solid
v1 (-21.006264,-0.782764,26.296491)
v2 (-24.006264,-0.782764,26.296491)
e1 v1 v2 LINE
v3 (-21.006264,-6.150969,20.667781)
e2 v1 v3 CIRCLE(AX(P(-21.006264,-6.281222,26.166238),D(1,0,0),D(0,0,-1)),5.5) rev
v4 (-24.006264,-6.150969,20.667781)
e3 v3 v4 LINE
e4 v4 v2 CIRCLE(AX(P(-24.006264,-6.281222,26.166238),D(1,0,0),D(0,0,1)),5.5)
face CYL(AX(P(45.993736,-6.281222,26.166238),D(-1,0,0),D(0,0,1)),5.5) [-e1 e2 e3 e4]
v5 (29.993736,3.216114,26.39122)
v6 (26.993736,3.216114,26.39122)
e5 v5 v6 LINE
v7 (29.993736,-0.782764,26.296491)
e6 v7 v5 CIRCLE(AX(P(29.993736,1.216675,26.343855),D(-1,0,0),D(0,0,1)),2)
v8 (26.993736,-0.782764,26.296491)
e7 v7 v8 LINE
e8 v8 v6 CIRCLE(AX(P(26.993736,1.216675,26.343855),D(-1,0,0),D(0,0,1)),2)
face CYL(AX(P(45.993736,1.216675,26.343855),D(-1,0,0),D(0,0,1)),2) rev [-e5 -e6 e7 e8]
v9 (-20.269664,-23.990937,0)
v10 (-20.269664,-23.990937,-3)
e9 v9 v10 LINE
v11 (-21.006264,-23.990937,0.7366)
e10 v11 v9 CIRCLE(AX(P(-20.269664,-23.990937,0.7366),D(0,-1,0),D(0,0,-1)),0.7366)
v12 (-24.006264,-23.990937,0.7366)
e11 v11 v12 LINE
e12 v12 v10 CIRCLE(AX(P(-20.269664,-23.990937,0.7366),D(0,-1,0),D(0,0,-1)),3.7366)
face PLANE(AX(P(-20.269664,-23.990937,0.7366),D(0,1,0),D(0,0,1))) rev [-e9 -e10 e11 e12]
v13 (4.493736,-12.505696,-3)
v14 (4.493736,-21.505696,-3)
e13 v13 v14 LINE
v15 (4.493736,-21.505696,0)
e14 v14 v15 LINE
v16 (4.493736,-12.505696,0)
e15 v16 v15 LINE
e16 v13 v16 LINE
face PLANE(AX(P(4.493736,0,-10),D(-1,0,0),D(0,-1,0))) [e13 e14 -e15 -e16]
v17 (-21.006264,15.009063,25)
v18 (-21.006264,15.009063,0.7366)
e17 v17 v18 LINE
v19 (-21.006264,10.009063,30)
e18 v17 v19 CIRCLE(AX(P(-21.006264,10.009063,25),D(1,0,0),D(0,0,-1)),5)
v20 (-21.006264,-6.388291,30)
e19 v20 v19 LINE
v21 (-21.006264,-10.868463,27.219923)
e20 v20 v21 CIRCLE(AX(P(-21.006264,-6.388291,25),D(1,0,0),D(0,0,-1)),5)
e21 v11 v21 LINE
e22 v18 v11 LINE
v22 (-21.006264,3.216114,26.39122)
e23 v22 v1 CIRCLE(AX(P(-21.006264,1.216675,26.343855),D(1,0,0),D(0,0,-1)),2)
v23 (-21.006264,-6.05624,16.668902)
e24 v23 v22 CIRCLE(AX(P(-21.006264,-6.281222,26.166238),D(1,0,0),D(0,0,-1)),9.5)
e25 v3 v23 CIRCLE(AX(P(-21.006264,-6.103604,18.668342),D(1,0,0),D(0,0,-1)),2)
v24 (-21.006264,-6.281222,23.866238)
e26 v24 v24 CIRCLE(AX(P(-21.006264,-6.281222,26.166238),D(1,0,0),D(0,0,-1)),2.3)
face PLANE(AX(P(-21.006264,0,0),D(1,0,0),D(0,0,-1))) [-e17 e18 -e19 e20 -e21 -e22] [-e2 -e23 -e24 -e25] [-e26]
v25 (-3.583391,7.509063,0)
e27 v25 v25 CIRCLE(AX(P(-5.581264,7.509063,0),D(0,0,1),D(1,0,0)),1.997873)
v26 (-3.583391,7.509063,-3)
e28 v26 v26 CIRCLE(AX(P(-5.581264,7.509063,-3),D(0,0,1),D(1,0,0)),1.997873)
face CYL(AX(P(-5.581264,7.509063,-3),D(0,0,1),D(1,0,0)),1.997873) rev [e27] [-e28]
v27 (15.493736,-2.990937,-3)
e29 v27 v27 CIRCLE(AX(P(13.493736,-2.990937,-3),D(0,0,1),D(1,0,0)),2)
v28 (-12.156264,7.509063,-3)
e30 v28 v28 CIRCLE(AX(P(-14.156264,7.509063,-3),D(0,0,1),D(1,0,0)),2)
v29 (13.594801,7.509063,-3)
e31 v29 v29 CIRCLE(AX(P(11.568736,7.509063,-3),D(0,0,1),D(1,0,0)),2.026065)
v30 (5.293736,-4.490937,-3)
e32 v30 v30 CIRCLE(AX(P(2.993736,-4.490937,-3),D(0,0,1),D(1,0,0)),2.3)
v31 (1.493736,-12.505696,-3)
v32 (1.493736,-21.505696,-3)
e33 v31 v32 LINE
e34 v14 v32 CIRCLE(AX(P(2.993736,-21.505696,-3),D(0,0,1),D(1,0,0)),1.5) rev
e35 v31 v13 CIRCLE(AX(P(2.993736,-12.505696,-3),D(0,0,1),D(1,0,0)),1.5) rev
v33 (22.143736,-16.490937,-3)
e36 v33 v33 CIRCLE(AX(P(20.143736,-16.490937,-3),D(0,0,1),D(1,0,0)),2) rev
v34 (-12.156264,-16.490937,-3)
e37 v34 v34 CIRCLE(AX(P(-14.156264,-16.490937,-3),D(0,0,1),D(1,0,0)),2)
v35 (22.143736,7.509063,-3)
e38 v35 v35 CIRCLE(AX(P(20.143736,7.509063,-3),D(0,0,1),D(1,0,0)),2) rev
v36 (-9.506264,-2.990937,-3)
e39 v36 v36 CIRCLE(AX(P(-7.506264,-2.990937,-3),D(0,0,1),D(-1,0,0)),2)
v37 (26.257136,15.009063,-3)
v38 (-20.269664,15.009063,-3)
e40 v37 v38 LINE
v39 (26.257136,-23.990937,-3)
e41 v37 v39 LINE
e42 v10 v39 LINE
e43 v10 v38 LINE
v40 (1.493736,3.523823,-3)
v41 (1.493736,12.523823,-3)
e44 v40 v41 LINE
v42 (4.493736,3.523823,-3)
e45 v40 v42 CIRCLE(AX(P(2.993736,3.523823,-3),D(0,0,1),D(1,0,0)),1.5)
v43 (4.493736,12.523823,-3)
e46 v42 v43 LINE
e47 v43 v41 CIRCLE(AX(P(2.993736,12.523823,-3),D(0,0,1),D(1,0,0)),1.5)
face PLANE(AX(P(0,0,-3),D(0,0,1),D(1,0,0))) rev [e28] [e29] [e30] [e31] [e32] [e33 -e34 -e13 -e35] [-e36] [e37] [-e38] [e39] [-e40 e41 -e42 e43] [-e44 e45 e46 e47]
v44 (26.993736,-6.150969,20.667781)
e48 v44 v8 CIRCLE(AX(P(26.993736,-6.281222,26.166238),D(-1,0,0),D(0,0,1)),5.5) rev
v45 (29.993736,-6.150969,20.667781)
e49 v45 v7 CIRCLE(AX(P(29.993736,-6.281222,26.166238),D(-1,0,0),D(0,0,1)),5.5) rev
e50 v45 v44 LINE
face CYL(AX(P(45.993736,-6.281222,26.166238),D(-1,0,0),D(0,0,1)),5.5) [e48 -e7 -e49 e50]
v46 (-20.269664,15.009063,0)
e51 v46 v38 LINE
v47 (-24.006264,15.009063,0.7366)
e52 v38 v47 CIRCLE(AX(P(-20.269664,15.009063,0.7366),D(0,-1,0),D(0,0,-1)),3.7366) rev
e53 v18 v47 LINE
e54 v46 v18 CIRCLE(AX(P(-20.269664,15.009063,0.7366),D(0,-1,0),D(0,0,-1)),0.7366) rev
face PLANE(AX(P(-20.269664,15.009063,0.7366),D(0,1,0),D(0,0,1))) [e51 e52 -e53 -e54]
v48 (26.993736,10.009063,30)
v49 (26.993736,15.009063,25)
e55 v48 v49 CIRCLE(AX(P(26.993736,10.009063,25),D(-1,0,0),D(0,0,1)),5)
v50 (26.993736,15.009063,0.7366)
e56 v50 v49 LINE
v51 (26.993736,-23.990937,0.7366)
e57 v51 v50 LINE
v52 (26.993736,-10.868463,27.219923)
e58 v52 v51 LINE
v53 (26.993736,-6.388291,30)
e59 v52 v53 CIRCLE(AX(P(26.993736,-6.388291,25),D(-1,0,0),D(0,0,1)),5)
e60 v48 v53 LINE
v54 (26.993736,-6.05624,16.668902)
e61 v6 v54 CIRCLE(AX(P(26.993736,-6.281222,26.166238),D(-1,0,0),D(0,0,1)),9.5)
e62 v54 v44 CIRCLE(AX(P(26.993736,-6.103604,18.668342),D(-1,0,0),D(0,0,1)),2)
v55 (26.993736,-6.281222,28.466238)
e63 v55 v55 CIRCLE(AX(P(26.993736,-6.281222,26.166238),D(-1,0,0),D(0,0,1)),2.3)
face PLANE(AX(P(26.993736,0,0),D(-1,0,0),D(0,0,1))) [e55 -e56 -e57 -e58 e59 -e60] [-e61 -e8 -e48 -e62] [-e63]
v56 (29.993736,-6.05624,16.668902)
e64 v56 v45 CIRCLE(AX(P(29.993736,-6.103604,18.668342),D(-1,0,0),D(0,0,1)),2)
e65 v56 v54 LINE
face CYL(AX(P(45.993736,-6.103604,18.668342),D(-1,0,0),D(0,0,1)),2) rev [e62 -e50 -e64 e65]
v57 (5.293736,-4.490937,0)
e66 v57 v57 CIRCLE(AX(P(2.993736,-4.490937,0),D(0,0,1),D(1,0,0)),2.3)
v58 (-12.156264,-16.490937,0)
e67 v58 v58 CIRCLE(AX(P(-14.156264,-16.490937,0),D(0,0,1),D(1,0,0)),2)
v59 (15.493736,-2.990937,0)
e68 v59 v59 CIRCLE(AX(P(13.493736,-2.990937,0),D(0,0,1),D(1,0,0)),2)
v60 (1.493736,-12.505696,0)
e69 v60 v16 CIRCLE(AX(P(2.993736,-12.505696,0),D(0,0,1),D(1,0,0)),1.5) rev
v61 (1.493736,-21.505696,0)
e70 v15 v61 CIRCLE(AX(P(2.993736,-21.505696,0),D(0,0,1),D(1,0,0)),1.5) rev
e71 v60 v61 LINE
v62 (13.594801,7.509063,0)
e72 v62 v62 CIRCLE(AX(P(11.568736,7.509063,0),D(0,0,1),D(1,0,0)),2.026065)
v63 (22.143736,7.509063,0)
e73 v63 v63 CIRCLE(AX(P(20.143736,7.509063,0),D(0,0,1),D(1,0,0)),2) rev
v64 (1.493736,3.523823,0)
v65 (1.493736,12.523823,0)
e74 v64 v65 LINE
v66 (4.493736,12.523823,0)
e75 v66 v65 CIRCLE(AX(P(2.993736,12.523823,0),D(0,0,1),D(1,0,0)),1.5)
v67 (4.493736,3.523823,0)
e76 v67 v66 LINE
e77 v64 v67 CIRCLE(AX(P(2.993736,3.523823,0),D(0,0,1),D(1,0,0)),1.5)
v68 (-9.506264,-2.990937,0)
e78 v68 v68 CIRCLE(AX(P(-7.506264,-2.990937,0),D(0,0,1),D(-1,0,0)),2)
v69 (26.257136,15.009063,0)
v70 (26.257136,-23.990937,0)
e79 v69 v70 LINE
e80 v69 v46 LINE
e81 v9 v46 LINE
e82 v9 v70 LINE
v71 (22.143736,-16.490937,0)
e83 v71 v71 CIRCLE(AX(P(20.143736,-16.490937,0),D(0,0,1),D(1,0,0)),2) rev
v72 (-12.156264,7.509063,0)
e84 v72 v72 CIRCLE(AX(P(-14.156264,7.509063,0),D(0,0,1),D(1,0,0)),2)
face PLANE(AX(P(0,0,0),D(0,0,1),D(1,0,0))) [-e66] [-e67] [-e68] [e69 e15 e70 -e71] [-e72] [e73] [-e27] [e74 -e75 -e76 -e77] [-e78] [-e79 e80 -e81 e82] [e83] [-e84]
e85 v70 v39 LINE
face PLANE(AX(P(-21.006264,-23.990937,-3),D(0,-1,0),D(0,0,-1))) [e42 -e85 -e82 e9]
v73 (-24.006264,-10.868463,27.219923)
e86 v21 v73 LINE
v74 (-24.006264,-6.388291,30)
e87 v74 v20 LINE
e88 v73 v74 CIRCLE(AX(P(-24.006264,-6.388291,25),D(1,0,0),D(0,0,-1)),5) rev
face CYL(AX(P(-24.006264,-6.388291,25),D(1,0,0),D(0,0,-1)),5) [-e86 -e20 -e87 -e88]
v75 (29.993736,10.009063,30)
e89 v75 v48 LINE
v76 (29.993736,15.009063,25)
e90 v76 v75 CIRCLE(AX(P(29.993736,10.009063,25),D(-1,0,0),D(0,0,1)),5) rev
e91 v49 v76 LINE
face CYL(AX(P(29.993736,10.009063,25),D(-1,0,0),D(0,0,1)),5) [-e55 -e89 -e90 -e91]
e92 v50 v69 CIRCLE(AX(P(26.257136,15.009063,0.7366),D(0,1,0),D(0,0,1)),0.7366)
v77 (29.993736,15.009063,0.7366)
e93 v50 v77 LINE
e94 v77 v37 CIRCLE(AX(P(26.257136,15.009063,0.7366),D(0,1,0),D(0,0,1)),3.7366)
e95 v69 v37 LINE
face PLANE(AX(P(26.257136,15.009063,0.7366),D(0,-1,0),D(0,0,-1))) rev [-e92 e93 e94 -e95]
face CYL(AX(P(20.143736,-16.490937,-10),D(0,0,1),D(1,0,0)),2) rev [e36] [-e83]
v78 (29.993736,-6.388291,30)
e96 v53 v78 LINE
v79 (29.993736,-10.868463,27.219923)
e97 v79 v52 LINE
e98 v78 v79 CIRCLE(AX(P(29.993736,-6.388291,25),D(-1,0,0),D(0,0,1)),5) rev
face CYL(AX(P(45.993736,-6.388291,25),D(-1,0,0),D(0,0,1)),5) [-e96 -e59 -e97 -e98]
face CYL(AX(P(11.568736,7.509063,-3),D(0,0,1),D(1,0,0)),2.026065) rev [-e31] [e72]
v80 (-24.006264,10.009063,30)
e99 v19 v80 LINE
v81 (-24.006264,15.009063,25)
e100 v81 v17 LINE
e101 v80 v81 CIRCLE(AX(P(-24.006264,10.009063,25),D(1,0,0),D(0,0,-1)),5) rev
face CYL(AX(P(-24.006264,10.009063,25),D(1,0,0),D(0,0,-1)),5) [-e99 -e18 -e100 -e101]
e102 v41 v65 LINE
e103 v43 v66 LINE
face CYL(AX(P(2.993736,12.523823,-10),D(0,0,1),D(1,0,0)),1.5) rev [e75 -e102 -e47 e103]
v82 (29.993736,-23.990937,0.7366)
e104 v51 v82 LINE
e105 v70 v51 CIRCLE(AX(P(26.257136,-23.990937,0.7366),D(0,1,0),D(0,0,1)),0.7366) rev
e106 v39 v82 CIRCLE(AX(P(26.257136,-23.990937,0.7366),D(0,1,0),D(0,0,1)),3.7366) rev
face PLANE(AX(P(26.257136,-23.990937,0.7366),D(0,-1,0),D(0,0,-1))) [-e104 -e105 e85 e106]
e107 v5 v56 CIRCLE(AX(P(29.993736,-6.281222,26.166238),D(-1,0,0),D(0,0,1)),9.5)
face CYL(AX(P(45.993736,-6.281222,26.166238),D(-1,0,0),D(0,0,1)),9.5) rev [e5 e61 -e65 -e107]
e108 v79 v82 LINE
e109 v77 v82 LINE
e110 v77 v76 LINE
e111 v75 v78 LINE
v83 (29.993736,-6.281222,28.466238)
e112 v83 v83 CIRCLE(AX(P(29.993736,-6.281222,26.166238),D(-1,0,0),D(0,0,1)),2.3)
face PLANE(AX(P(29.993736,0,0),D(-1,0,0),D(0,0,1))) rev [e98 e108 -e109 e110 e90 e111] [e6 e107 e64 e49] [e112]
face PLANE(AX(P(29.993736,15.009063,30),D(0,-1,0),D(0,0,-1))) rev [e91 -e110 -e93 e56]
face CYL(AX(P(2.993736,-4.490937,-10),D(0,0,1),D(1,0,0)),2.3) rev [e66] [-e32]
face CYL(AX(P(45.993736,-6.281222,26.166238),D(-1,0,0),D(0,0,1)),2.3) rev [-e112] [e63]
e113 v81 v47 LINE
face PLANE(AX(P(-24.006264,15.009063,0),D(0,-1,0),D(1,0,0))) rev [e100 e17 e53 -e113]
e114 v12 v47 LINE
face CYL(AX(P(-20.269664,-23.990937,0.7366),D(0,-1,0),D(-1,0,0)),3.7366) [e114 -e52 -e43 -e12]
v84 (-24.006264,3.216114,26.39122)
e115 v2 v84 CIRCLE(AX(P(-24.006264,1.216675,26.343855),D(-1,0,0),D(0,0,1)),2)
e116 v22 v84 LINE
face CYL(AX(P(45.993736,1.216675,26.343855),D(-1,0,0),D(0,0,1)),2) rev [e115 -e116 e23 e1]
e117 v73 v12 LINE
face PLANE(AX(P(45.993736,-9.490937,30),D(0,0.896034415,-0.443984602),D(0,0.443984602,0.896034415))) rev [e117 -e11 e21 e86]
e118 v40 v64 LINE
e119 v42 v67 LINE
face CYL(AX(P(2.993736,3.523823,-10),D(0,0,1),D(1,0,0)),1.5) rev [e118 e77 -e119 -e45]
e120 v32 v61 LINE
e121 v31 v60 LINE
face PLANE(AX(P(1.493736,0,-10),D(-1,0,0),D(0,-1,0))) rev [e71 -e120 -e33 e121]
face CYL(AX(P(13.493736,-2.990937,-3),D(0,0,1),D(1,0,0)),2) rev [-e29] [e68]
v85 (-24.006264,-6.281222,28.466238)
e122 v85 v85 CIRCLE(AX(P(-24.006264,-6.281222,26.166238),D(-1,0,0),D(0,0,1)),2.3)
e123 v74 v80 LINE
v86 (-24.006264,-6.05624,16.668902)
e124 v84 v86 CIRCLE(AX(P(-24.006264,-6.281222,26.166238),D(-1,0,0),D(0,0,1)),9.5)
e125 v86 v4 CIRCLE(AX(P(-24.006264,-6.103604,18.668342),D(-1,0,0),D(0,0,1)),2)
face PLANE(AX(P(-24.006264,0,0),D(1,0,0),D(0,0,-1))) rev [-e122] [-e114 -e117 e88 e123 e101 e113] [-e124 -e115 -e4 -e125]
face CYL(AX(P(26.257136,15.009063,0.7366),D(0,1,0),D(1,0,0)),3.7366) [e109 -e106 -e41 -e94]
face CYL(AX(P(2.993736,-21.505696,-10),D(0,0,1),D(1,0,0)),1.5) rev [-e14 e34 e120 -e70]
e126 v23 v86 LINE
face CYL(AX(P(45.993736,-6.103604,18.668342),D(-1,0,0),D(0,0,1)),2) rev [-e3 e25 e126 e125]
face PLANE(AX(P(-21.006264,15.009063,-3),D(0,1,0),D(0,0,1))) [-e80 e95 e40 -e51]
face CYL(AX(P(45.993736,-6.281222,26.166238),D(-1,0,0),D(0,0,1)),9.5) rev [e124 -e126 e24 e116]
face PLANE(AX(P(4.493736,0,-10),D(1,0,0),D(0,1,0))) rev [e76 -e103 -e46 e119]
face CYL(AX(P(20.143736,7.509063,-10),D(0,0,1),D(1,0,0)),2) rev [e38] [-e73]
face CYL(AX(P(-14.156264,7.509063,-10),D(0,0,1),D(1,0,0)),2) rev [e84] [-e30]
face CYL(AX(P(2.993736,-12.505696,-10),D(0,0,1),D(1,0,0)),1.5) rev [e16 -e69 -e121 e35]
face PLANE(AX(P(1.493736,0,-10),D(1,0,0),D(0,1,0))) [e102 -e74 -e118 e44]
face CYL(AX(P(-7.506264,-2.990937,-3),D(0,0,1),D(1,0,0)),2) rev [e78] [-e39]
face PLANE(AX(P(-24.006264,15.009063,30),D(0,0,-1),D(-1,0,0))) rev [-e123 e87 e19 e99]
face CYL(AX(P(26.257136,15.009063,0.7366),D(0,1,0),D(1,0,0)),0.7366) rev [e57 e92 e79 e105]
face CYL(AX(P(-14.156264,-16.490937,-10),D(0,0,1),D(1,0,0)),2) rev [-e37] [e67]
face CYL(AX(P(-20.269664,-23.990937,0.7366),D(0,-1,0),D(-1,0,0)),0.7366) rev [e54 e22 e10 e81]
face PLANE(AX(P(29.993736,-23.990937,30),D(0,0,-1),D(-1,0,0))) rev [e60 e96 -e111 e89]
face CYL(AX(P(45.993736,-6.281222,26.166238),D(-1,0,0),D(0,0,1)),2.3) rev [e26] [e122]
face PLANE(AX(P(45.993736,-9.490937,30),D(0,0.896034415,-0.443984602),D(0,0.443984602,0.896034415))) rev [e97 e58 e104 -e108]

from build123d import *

# Parameters (mm, degrees)
ESBO_O1_W                        = 48
ESBO_O1_H                        = 39
FLANGE_BASE1_DEPTH               = 3
ESBO_O6_R                        = 2.3
CORTE_EXTRUS_O1_DEPTH            = 10
ARESTA_FLANGE1_STRIP_W           = 13.4732
ARESTA_FLANGE1_STRIP_H           = 3
ARESTA_FLANGE1_STRIP_CUT_DEPTH   = 39
ARESTA_FLANGE1_STRIP_2_W         = 13.4732
ARESTA_FLANGE1_STRIP_2_H         = 3
ARESTA_FLANGE1_STRIP_CUT_2_DEPTH = 39
ARESTA_FLANGE1_DEPTH             = 39
ARESTA_FLANGE1_BEND_DEPTH        = 39
ESBO_O13_R                       = 2.3
CORTE_EXTRUS_O2_DEPTH            = 70
FILETE1_R                        = 5
ESBO_O14_R                       = 1.997873176
ESBO_O14_R_2                     = 2.026064888
ESBO_O14_R_3                     = 2
CORTE_EXTRUS_O4_DEPTH            = 3


# Sheet-metal steps are written as plain solids
with BuildPart() as part:
    # Esboço1 → Flange-base1 (new body)
    with BuildSketch(Plane.XY):
        with Locations((2.993735783, -4.490936556)):
            Rectangle(ESBO_O1_W, ESBO_O1_H)
    extrude(amount=-FLANGE_BASE1_DEPTH)

    # Esboço6 → Corte-extrusão1 (cut)
    with BuildSketch(Plane.XY):
        with BuildLine():
            Line((-14.156264217, 5.509063444), (-14.156264217, 7.509063444))
            Line((-14.156264217, 7.509063444), (-12.156264217, 7.509063444))
            ThreePointArc((-12.156264217, 7.509063444), (-15.570477779, 8.923277006), (-14.156264217, 5.509063444))
        make_face()
        with BuildLine():
            Line((-12.156264217, 7.509063444), (-14.156264217, 7.509063444))
            Line((-14.156264217, 7.509063444), (-14.156264217, 5.509063444))
            ThreePointArc((-14.156264217, 5.509063444), (-12.742050654, 6.094849882), (-12.156264217, 7.509063444))
        make_face()
        with BuildLine():
            ThreePointArc((-12.156264217, -16.490936556), (-12.742050654, -15.076722994), (-14.156264217, -14.490936556))
            Line((-14.156264217, -14.490936556), (-14.156264217, -16.490936556))
            Line((-14.156264217, -16.490936556), (-12.156264217, -16.490936556))
        make_face()
        with BuildLine():
            Line((-14.156264217, -16.490936556), (-14.156264217, -14.490936556))
            ThreePointArc((-14.156264217, -14.490936556), (-15.570477779, -17.905150118), (-12.156264217, -16.490936556))
            Line((-12.156264217, -16.490936556), (-14.156264217, -16.490936556))
        make_face()
        with Locations((2.993735783, -4.490936556)):
            Circle(ESBO_O6_R)
        with BuildLine():
            Line((4.493735783, 7.509063444), (1.493735783, 7.509063444))
            Line((1.493735783, 7.509063444), (1.493735783, 3.523823043))
            ThreePointArc((1.493735783, 3.523823043), (2.993735783, 2.023823043), (4.493735783, 3.523823043))
            Line((4.493735783, 3.523823043), (4.493735783, 7.509063444))
        make_face()
        with BuildLine():
            Line((1.493735783, 12.523823043), (1.493735783, 7.509063444))
            Line((1.493735783, 7.509063444), (4.493735783, 7.509063444))
            Line((4.493735783, 7.509063444), (4.493735783, 12.523823043))
            ThreePointArc((4.493735783, 12.523823043), (2.993735783, 14.023823043), (1.493735783, 12.523823043))
        make_face()
        with BuildLine():
            Line((1.493735783, -12.505696155), (1.493735783, -16.490936556))
            Line((1.493735783, -16.490936556), (4.493735783, -16.490936556))
            Line((4.493735783, -16.490936556), (4.493735783, -12.505696155))
            ThreePointArc((4.493735783, -12.505696155), (2.993735783, -11.005696155), (1.493735783, -12.505696155))
        make_face()
        with BuildLine():
            Line((4.493735783, -16.490936556), (1.493735783, -16.490936556))
            Line((1.493735783, -16.490936556), (1.493735783, -21.505696155))
            ThreePointArc((1.493735783, -21.505696155), (2.993735783, -23.005696155), (4.493735783, -21.505696155))
            Line((4.493735783, -21.505696155), (4.493735783, -16.490936556))
        make_face()
        with BuildLine():
            ThreePointArc((22.143735783, -16.490936556), (21.557949346, -15.076722994), (20.143735783, -14.490936556))
            Line((20.143735783, -14.490936556), (20.143735783, -16.490936556))
            Line((20.143735783, -16.490936556), (18.143735783, -16.490936556))
            ThreePointArc((18.143735783, -16.490936556), (20.143735783, -18.490936556), (22.143735783, -16.490936556))
        make_face()
        with BuildLine():
            Line((20.143735783, -16.490936556), (20.143735783, -14.490936556))
            ThreePointArc((20.143735783, -14.490936556), (18.729522221, -15.076722994), (18.143735783, -16.490936556))
            Line((18.143735783, -16.490936556), (20.143735783, -16.490936556))
        make_face()
        with BuildLine():
            ThreePointArc((22.143735783, 7.509063444), (20.143735783, 9.509063444), (18.143735783, 7.509063444))
            Line((18.143735783, 7.509063444), (20.143735783, 7.509063444))
            Line((20.143735783, 7.509063444), (20.143735783, 5.509063444))
            ThreePointArc((20.143735783, 5.509063444), (21.557949346, 6.094849882), (22.143735783, 7.509063444))
        make_face()
        with BuildLine():
            Line((20.143735783, 7.509063444), (18.143735783, 7.509063444))
            ThreePointArc((18.143735783, 7.509063444), (18.729522221, 6.094849882), (20.143735783, 5.509063444))
            Line((20.143735783, 5.509063444), (20.143735783, 7.509063444))
        make_face()
    extrude(amount=-CORTE_EXTRUS_O1_DEPTH, mode=Mode.SUBTRACT)

    # Aresta-Flange1 strip (across the edge) → Aresta-Flange1 strip cut (cut)
    with BuildSketch(Plane(origin=(26.993735783, -23.990936556, 0), x_dir=(-1, 0, 0), z_dir=(0, 1, 0))):
        with Locations((-6, -1.5)):
            Rectangle(ARESTA_FLANGE1_STRIP_W, ARESTA_FLANGE1_STRIP_H)
    extrude(amount=ARESTA_FLANGE1_STRIP_CUT_DEPTH, mode=Mode.SUBTRACT)

    # Aresta-Flange1 strip 2 (across the edge) → Aresta-Flange1 strip cut 2 (cut)
    with BuildSketch(Plane(origin=(-21.006264217, 15.009063444, 0), x_dir=(1, 0, 0), z_dir=(0, -1, 0))):
        with Locations((-6, -1.5)):
            Rectangle(ARESTA_FLANGE1_STRIP_2_W, ARESTA_FLANGE1_STRIP_2_H)
    extrude(amount=ARESTA_FLANGE1_STRIP_CUT_2_DEPTH, mode=Mode.SUBTRACT)

    # Aresta-Flange1 section (across the edge) → Aresta-Flange1 (add)
    with BuildSketch(Plane(origin=(26.993735783, -23.990936556, 0), x_dir=(-1, 0, 0), z_dir=(0, 1, 0))):
        with BuildLine():
            Line((-3, 0.7366), (-3, 30))
            Line((-3, 30), (0, 30))
            Line((0, 30), (0, 0.7366))
            ThreePointArc((0, 0.7366), (0.215745145, 0.215745145), (0.7366, 0))
            Line((0.7366, 0), (0.7366, -3))
            ThreePointArc((0.7366, -3), (-1.905575199, -1.905575199), (-3, 0.7366))
        make_face()
    extrude(amount=ARESTA_FLANGE1_DEPTH)

    # Aresta-Flange1 section 2 (across the edge) → Aresta-Flange1 bend (add)
    with BuildSketch(Plane(origin=(-21.006264217, 15.009063444, 0), x_dir=(1, 0, 0), z_dir=(0, -1, 0))):
        with BuildLine():
            Line((-3, 0.7366), (-3, 30))
            Line((-3, 30), (0, 30))
            Line((0, 30), (0, 0.7366))
            ThreePointArc((0, 0.7366), (0.215745145, 0.215745145), (0.7366, 0))
            Line((0.7366, 0), (0.7366, -3))
            ThreePointArc((0.7366, -3), (-1.905575199, -1.905575199), (-3, 0.7366))
        make_face()
    extrude(amount=ARESTA_FLANGE1_BEND_DEPTH)

    # Esboço13 → Corte-extrusão2 (cut)
    with BuildSketch(Plane.ZY.offset(24.006264217)):
        with Locations((26.166238029, -6.281221748)):
            Circle(ESBO_O13_R)
        Polygon((0.7366, -23.990936556), (30, -23.990936556), (30, -9.490936556), align=None)
        with BuildLine():
            ThreePointArc((26.391219924, 3.216113833), (19.60969386, 0.593494869), (16.668902447, -6.056239853))
            ThreePointArc((16.668902447, -6.056239853), (18.620976907, -8.103043532), (20.667780587, -6.150969072))
            ThreePointArc((20.667780587, -6.150969072), (22.370344036, -2.301122654), (26.296490705, -0.782764306))
            ThreePointArc((26.296490705, -0.782764306), (28.343294384, 1.169310154), (26.391219924, 3.216113833))
        make_face()
    extrude(amount=-CORTE_EXTRUS_O2_DEPTH, mode=Mode.SUBTRACT)

    # Filete1
    filete1_edges = [part.edges().sort_by_distance(p)[0] for p in [
        (28.493735783, 15.009063444, 30),
        (-22.506264217, 15.009063444, 30),
        (-22.506264217, -9.490936556, 30),
        (28.493735783, -9.490936556, 30),
    ]]
    fillet(filete1_edges, radius=FILETE1_R)

    # Esboço14 → Corte-extrusão4 (cut)
    with BuildSketch(Plane.XY):
        with Locations((-5.581264217, 7.509063444)):
            Circle(ESBO_O14_R)
        with Locations((11.568735783, 7.509063444)):
            Circle(ESBO_O14_R_2)
        with Locations((13.493735783, -2.990936556)):
            Circle(ESBO_O14_R_3)
        with Locations(Location((-7.506264217, -2.990936556, 0), (0, 0, 180))):
            Circle(ESBO_O14_R_3)
    extrude(amount=-CORTE_EXTRUS_O4_DEPTH, mode=Mode.SUBTRACT)


solid = part.part
